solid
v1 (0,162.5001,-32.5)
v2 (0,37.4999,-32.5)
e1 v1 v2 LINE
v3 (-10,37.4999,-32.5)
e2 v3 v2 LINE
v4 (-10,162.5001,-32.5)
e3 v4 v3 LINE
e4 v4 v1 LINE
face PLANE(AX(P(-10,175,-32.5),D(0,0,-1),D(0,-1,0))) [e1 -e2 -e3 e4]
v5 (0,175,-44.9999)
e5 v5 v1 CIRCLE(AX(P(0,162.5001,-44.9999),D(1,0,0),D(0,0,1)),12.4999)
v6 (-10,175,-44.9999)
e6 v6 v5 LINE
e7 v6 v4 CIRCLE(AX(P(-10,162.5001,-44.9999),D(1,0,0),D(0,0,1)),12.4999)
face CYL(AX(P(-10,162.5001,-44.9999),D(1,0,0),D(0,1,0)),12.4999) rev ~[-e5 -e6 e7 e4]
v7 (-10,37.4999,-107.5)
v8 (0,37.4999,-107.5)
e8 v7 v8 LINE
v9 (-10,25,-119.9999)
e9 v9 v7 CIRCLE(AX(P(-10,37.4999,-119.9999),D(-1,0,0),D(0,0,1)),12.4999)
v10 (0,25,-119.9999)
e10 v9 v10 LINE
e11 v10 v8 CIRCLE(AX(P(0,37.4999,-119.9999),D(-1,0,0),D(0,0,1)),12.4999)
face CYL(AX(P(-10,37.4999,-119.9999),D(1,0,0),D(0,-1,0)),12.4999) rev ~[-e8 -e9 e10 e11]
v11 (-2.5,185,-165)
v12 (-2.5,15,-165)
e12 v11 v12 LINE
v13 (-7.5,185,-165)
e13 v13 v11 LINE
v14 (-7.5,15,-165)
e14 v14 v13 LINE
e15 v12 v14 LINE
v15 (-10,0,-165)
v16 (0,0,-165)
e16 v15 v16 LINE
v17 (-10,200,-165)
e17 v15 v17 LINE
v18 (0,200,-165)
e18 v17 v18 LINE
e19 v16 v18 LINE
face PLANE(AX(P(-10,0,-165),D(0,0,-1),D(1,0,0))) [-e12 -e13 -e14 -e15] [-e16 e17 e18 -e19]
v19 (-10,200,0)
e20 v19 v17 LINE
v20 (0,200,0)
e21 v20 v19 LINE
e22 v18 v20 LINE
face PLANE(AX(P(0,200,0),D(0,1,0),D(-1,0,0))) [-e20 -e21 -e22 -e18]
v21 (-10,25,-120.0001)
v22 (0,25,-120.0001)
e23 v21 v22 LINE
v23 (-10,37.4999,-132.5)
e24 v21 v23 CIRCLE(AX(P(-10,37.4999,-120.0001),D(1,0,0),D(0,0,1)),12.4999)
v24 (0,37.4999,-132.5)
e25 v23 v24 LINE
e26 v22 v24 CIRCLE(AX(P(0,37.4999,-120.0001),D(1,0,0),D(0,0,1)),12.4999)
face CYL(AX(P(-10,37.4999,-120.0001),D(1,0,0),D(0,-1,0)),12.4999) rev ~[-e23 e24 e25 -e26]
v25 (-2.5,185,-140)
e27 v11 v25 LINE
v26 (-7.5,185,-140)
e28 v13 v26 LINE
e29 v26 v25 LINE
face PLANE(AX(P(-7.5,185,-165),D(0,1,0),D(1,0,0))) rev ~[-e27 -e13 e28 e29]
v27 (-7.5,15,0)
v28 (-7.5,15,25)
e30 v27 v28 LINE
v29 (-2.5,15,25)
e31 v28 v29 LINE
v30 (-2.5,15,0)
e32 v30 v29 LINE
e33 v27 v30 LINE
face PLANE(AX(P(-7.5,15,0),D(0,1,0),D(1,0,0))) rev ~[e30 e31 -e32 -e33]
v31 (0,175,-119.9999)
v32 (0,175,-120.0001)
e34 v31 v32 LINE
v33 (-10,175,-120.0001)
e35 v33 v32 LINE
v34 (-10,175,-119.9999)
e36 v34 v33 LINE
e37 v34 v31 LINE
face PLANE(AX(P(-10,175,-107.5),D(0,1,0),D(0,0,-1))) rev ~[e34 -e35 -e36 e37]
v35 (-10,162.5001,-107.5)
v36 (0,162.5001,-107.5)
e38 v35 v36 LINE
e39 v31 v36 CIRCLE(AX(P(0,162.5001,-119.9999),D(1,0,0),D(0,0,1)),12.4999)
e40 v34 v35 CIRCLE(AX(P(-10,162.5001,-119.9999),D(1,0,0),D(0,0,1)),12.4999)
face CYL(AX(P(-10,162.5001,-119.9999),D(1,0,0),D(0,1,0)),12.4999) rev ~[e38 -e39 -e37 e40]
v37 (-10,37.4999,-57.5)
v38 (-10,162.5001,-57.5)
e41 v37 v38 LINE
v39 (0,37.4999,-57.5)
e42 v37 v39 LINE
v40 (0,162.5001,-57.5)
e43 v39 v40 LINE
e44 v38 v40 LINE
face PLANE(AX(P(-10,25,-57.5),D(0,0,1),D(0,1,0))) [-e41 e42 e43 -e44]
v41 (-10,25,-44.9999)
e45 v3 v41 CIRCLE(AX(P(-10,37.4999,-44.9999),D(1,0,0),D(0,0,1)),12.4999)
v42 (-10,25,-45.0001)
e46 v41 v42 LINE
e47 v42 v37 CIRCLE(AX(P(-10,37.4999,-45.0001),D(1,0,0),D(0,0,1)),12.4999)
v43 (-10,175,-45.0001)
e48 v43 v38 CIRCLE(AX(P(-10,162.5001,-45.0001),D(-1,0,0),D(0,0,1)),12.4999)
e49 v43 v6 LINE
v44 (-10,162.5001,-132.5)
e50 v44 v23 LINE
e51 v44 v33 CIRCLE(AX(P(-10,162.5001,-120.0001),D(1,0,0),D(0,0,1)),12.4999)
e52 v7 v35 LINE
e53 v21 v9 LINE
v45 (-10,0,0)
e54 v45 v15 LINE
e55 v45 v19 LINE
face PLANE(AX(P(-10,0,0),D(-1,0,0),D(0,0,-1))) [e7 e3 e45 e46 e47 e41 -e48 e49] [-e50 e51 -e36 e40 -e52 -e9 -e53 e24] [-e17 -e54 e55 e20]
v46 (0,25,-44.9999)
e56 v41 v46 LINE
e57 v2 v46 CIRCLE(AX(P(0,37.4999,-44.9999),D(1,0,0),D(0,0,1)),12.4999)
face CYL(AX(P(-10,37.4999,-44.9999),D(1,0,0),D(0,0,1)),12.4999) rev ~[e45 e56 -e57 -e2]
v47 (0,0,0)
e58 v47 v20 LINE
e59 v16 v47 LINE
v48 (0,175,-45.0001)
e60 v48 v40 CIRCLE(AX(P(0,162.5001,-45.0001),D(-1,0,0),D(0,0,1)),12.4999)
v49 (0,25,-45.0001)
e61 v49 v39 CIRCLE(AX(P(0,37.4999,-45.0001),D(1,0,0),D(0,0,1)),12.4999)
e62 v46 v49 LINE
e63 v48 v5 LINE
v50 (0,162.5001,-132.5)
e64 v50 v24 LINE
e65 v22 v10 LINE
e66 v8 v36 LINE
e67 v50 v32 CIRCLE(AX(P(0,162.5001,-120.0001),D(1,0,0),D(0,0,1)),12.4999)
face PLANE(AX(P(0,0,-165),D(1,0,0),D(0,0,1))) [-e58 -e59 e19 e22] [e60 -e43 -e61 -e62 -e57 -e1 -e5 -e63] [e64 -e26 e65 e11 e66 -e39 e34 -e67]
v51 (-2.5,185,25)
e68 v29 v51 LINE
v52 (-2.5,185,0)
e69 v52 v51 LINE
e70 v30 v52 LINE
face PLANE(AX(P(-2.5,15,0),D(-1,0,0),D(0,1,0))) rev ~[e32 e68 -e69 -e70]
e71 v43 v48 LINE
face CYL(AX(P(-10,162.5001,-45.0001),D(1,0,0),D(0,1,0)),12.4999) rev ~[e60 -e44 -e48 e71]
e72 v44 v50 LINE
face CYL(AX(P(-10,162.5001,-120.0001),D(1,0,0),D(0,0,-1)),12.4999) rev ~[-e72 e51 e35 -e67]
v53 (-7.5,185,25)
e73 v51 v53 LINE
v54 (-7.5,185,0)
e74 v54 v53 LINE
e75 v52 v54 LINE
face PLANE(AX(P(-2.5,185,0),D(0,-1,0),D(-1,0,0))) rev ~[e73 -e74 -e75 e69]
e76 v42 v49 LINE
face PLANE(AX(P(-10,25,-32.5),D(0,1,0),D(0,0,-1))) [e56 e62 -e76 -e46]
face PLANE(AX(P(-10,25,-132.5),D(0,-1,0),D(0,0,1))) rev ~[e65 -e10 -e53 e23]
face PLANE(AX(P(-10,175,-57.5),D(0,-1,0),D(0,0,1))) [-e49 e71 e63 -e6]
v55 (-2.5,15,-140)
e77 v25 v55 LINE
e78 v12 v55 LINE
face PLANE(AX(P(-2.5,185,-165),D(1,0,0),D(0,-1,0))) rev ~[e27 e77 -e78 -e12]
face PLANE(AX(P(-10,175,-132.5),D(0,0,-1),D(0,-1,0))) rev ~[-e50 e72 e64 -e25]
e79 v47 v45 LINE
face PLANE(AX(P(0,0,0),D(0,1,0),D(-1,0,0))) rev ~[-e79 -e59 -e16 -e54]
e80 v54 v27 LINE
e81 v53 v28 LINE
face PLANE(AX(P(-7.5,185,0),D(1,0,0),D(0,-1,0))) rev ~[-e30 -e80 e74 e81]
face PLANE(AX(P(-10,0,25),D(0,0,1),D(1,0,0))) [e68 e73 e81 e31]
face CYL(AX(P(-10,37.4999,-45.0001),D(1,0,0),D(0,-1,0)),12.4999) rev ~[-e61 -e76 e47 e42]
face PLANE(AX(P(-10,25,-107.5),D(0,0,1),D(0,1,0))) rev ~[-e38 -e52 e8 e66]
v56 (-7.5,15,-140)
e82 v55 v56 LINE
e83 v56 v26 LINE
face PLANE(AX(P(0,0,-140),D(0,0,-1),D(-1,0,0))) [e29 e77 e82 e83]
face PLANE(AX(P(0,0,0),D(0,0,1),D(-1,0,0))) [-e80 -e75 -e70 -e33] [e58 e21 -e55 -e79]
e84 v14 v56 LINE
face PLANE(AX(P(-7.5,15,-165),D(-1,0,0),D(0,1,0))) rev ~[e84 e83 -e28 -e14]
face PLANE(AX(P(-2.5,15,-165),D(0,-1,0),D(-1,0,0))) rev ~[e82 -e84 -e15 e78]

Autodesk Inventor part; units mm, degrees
ref_plane "YZ Plane" through (0, 0, 0) normal (1, 0, 0) x (0, 1, 0)
ref_plane "XZ Plane" through (0, 0, 0) normal (0, 1, 0) x (-1, 0, 0)
ref_plane "XY Plane" through (0, 0, 0) normal (0, 0, 1) x (1, 0, 0)
sketch "Sketch1" plane through (0, 0, 0) normal (0, 1, 0) x (-1, 0, 0)
  line L0 (0, 0) -> (10, 0)
  line L1 (10, 0) -> (10, -165)
  line L2 (10, -165) -> (0, -165)
  line L3 (0, -165) -> (0, 0)
  dimension "d0" = 10
  dimension "d1" = 165
extrude "Extrusion1" add sketch "Sketch1" along normal blind 200
sketch "Sketch2" plane through (-10, 0, 0) normal (0, 0, 1) x (1, 0, 0)
  line L0 (2.5, 15) -> (7.5, 15)
  line L1 (7.5, 15) -> (7.5, 185)
  line L2 (7.5, 185) -> (2.5, 185)
  line L3 (2.5, 185) -> (2.5, 15)
  point P0 (10, 0)
  dimension "d4" = 5
  dimension "d5" = 170
extrude "Extrusion2" add sketch "Sketch2" along normal blind 25
sketch "Sketch3" plane through (0, 0, -165) normal (0, 0, -1) x (-1, 0, 0)
  line L0 (2.5, 15) -> (7.5, 15)
  line L1 (7.5, 15) -> (7.5, 185)
  line L2 (7.5, 185) -> (2.5, 185)
  line L3 (2.5, 185) -> (2.5, 15)
  point P0 (0, 0)
  dimension "d8" = 5
  dimension "d9" = 170
extrude "Extrusion3" cut sketch "Sketch3" against normal blind 25
sketch "Sketch4" plane through (-10, 0, -165) normal (-1, 0, 0) x (0, 0, 1)
  line L0 (0, 200) -> (165, 200) construction
  line L1 (82.5, 200) -> (82.5, 0) construction
  line L2 (0, 0) -> (165, 0) construction
  line L3 (107.5, 175) -> (132.5, 175)
  line L4 (132.5, 175) -> (132.5, 25)
  line L5 (132.5, 25) -> (107.5, 25)
  line L6 (107.5, 25) -> (107.5, 175)
  line L7 (57.5, 175) -> (32.5, 175)
  line L8 (32.5, 175) -> (32.5, 25)
  line L9 (32.5, 25) -> (57.5, 25)
  line L10 (57.5, 25) -> (57.5, 175)
  dimension "d12" = 25
  dimension "d13" = 150
  dimension "d14" = 25
  dimension "d15" = 150
extrude "Extrusion4" cut sketch "Sketch4" against normal blind 10
fillet "Fillet1" radius 12.5 8 edges at (-5, 175, -107.5) (-5, 175, -32.5) (-5, 175, -57.5) (-5, 175, -132.5) (-5, 25, -132.5) (-5, 25, -107.5) (-5, 25, -57.5) (-5, 25, -32.5)
properties part number "TSU_FM_Side_Wall"
